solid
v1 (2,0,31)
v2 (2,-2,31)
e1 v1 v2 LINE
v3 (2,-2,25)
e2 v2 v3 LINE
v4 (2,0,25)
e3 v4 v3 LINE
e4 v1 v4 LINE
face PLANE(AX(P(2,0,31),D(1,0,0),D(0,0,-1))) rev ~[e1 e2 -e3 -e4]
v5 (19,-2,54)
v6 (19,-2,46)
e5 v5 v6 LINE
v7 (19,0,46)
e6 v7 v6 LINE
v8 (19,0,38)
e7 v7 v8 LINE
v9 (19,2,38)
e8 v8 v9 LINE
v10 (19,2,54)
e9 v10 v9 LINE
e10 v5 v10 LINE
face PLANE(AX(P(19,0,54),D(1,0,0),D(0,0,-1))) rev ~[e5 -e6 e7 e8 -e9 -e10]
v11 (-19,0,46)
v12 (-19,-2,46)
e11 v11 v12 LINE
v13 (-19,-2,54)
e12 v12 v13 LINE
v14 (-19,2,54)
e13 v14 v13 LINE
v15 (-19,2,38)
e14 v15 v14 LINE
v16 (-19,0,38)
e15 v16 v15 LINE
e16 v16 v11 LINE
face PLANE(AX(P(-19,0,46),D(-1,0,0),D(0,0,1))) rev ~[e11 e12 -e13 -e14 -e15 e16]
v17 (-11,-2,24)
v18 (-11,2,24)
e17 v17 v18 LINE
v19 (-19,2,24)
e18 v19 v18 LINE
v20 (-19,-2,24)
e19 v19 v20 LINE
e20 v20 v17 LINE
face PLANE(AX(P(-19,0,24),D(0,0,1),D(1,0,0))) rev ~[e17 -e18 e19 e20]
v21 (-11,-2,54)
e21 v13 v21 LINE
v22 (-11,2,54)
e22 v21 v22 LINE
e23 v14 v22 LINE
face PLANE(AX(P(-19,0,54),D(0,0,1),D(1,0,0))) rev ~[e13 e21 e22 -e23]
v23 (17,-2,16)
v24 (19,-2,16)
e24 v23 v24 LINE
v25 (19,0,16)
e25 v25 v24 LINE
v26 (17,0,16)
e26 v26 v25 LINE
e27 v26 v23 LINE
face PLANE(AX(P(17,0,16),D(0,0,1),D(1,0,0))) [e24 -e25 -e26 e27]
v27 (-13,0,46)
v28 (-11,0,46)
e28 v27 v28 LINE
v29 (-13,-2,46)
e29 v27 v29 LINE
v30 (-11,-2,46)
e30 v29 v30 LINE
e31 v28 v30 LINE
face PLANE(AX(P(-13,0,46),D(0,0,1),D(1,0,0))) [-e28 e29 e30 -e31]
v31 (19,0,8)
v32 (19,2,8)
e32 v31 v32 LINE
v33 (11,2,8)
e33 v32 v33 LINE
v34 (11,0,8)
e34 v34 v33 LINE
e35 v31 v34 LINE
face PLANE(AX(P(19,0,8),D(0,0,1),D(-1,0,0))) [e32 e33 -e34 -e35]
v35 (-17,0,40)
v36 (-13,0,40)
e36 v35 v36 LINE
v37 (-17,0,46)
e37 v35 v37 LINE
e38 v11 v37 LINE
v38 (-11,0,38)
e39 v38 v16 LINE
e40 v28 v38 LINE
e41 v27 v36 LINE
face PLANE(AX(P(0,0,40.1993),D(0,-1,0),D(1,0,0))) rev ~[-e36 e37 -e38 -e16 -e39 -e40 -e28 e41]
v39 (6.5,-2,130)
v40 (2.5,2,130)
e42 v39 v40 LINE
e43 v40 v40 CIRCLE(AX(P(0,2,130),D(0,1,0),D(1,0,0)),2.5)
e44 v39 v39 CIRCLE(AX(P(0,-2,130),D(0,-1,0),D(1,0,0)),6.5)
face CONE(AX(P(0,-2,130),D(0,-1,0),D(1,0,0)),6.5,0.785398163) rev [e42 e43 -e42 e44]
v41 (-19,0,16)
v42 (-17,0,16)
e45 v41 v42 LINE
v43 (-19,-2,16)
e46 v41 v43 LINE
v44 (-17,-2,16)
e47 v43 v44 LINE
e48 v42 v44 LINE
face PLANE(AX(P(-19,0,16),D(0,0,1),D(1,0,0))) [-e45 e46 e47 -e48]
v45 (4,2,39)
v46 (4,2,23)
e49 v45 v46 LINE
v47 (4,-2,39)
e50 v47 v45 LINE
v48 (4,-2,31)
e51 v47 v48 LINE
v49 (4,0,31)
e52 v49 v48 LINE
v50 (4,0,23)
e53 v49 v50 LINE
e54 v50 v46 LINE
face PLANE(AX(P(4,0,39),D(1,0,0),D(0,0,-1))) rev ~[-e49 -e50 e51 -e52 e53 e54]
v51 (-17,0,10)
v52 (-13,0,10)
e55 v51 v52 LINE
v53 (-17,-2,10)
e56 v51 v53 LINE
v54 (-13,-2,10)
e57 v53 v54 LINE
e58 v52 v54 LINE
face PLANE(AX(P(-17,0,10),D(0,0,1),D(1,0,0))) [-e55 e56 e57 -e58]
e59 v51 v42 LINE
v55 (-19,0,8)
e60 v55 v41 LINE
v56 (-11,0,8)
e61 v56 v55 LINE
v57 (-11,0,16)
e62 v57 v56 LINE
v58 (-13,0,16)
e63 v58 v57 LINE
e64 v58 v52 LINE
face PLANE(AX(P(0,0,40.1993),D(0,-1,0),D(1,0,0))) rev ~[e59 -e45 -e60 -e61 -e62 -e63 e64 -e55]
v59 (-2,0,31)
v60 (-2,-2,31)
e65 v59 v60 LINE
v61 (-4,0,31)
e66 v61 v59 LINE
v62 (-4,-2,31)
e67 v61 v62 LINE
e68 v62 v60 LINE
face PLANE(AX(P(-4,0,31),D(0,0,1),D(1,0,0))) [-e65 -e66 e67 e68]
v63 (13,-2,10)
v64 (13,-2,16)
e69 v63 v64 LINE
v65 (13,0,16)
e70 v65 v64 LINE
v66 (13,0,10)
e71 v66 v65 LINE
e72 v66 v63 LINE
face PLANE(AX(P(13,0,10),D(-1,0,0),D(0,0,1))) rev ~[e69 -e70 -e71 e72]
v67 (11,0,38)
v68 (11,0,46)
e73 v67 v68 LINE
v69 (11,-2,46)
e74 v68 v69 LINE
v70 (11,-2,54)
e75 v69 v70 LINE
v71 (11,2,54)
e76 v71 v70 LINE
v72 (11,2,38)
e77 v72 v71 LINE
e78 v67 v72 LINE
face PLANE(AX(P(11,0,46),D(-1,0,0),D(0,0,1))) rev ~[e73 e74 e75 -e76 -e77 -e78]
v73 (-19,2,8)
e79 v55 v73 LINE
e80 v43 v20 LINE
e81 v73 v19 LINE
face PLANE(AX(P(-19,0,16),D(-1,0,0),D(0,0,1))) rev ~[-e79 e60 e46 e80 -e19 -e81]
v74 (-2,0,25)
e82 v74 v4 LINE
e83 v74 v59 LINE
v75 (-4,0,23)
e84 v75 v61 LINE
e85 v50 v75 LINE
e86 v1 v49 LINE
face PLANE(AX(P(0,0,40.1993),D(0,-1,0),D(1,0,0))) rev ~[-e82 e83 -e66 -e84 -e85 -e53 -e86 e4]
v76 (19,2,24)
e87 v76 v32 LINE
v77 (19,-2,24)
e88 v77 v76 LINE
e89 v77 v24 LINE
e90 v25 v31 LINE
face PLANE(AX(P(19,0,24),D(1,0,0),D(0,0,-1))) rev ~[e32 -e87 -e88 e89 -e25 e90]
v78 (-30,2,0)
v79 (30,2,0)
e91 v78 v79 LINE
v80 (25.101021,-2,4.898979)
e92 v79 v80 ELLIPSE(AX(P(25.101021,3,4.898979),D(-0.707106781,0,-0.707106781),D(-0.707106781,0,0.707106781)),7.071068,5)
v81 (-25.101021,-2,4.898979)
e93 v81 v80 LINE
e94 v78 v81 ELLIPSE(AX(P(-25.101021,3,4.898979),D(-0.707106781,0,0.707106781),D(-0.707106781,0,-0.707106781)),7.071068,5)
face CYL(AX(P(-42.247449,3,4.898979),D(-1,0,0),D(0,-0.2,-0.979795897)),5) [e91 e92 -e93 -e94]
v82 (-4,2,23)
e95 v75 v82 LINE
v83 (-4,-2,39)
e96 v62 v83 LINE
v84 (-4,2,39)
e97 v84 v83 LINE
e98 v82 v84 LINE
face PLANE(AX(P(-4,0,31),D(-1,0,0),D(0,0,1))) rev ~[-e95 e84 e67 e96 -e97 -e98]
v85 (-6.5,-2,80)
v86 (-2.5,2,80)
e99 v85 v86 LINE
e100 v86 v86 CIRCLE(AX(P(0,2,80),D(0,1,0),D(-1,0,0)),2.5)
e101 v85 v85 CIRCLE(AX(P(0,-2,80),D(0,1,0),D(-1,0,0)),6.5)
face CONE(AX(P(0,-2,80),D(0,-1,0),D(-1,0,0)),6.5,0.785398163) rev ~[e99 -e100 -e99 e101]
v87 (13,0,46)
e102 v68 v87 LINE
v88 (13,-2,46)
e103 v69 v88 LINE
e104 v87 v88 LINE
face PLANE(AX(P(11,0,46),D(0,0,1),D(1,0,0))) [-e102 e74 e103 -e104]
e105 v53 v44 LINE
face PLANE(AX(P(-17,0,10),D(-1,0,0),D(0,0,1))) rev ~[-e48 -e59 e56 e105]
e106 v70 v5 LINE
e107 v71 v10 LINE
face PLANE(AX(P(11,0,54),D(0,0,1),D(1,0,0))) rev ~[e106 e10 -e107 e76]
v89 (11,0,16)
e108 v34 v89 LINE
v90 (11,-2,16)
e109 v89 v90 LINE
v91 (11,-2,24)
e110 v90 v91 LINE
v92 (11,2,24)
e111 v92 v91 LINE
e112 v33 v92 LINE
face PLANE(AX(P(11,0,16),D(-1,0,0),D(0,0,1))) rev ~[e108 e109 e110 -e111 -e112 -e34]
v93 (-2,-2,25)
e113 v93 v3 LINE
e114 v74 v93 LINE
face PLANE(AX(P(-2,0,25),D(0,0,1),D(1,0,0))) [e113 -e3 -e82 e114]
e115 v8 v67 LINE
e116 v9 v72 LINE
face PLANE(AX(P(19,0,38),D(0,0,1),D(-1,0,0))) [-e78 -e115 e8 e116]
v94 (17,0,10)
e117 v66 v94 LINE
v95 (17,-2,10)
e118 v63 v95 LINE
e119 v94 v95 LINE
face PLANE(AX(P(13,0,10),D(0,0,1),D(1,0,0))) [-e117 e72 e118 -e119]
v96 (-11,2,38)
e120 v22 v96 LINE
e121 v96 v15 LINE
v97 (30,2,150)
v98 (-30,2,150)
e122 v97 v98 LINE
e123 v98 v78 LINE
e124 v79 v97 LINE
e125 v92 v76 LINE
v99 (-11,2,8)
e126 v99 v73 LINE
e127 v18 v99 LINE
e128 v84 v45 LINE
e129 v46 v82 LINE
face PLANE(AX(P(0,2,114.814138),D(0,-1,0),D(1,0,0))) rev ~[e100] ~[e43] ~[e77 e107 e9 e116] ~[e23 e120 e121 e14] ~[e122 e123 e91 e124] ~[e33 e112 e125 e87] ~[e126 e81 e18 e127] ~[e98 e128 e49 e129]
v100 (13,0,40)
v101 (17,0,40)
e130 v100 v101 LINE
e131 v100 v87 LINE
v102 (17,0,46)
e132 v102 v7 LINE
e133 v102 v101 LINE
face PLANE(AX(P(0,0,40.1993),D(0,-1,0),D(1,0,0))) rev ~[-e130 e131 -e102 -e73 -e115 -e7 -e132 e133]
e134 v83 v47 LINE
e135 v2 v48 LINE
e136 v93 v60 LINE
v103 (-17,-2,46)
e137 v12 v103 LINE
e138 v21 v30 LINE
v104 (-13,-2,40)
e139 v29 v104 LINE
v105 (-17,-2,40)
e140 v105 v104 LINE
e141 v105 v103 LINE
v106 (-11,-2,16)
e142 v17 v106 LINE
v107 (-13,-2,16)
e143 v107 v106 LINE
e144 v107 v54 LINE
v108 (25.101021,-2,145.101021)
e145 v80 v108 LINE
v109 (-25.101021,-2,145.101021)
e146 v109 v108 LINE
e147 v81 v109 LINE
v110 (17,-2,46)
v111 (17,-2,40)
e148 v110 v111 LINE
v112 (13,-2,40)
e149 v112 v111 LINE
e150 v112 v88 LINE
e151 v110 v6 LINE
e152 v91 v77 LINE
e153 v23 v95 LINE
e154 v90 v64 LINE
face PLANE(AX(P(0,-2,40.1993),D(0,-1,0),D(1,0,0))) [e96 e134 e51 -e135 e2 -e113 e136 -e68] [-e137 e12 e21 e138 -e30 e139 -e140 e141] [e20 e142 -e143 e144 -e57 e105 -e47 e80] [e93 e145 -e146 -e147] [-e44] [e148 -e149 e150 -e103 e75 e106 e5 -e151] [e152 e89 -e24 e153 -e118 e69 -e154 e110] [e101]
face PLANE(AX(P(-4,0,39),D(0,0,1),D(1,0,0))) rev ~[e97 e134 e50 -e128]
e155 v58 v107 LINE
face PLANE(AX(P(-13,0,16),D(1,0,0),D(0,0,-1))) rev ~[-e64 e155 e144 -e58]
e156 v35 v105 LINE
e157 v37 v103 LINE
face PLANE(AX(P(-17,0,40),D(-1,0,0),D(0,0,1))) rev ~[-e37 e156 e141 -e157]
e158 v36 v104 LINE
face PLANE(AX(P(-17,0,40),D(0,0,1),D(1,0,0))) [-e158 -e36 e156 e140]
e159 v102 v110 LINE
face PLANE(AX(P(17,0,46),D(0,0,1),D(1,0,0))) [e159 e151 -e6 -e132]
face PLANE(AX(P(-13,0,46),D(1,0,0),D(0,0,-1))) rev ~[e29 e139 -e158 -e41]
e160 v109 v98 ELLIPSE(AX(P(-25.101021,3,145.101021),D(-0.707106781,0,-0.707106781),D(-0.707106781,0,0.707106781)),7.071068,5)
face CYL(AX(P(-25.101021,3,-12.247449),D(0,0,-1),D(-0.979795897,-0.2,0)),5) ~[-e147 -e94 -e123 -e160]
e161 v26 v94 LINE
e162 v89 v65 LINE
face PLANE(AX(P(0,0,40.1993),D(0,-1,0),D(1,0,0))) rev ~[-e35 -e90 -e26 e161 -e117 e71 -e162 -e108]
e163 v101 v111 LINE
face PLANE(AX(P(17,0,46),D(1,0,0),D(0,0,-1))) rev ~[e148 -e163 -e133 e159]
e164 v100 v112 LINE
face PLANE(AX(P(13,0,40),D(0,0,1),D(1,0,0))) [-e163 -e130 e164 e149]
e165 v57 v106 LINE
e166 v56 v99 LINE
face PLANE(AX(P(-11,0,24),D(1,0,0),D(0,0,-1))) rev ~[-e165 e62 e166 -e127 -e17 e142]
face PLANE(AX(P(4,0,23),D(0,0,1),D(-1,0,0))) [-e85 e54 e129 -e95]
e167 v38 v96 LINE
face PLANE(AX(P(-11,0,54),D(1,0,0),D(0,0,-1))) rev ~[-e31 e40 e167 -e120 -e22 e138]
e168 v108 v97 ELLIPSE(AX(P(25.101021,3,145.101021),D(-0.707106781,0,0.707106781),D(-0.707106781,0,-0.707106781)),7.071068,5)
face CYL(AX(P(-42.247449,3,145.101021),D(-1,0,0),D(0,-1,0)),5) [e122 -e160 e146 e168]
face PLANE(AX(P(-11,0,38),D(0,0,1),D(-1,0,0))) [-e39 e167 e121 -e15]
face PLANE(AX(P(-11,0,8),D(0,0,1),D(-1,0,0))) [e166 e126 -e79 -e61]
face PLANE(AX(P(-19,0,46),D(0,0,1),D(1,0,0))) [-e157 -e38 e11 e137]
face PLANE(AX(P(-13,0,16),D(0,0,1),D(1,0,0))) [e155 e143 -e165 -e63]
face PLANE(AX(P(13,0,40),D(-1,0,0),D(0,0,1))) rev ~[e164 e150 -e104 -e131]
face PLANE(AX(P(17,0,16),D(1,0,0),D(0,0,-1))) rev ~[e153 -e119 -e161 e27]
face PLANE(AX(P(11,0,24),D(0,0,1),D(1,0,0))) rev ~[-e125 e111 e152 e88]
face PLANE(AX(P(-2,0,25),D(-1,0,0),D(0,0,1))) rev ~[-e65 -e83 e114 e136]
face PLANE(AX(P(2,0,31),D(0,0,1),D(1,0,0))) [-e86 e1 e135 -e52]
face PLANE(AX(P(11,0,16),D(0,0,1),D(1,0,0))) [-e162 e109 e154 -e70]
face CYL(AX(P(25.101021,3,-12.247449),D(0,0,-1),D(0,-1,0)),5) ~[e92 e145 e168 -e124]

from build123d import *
from build123d import SkipClean  # not in build123d's __all__

# Parameters (mm, degrees)
F0_R        = 1.5
F1_DEPTH    = 2
F0_W        = 2
F0_H        = 6
F0_H_2      = 2
F0_W_2      = 4
F2_DEPTH    = 2
F4_T1_DEPTH = 84.4948974279
F4_T3_DEPTH = 174.4948974279


# Not quite as in the source:
# - a fillet or chamfer that OpenCascade refuses, or shapes differently, is made with other operations: its cross-section is extruded or revolved along the edge and cut away or added


with BuildPart() as f1:
    # F0 (on Front) → F1 (new body)
    with BuildSketch(Plane.XZ):
        with BuildLine():
            Line((-30, 150), (-30, 80))
            Line((-30, 80), (-1.5, 80))
            ThreePointArc((-1.5, 80), (0, 81.5), (1.5, 80))
            Line((1.5, 80), (30, 80))
            Line((30, 80), (30, 150))
            Line((30, 150), (-30, 150))
        make_face()
        with Locations((0, 130)):
            Circle(F0_R, mode=Mode.SUBTRACT)
        with BuildLine():
            Line((-30, 0), (0, 0))
            Line((0, 0), (30, 0))
            Line((30, 0), (30, 80))
            Line((30, 80), (1.5, 80))
            ThreePointArc((1.5, 80), (0, 78.5), (-1.5, 80))
            Line((-1.5, 80), (-30, 80))
            Line((-30, 80), (-30, 0))
        make_face()
        Polygon((-11, 24), (-11, 16), (-11, 10), (-11, 8), (-13, 8), (-17, 8), (-19, 8), (-19, 10), (-19, 16), (-19, 24), align=None, mode=Mode.SUBTRACT)
        Polygon((-11, 48), (-11, 46), (-11, 40), (-11, 38), (-13, 38), (-17, 38), (-19, 38), (-19, 40), (-19, 46), (-19, 48), (-19, 54), (-11, 54), align=None, mode=Mode.SUBTRACT)
        Polygon((4, 39), (4, 31), (4, 25), (4, 23), (2, 23), (-2, 23), (-4, 23), (-4, 25), (-4, 31), (-4, 39), align=None, mode=Mode.SUBTRACT)
        Polygon((19, 24), (19, 16), (19, 10), (19, 8), (17, 8), (13, 8), (11, 8), (11, 10), (11, 16), (11, 24), align=None, mode=Mode.SUBTRACT)
        Polygon((19, 54), (19, 46), (19, 40), (19, 38), (17, 38), (13, 38), (11, 38), (11, 40), (11, 46), (11, 54), align=None, mode=Mode.SUBTRACT)
    extrude(amount=-F1_DEPTH)

    # F0 (on Front) → F2 (join)
    with BuildSketch(Plane.XZ):
        with BuildLine():
            Line((-30, 0), (0, 0))
            Line((0, 0), (30, 0))
            Line((30, 0), (30, 80))
            Line((30, 80), (1.5, 80))
            ThreePointArc((1.5, 80), (0, 78.5), (-1.5, 80))
            Line((-1.5, 80), (-30, 80))
            Line((-30, 80), (-30, 0))
        make_face()
        Polygon((-11, 24), (-11, 16), (-11, 10), (-11, 8), (-13, 8), (-17, 8), (-19, 8), (-19, 10), (-19, 16), (-19, 24), align=None, mode=Mode.SUBTRACT)
        Polygon((-11, 48), (-11, 46), (-11, 40), (-11, 38), (-13, 38), (-17, 38), (-19, 38), (-19, 40), (-19, 46), (-19, 48), (-19, 54), (-11, 54), align=None, mode=Mode.SUBTRACT)
        Polygon((4, 39), (4, 31), (4, 25), (4, 23), (2, 23), (-2, 23), (-4, 23), (-4, 25), (-4, 31), (-4, 39), align=None, mode=Mode.SUBTRACT)
        Polygon((19, 24), (19, 16), (19, 10), (19, 8), (17, 8), (13, 8), (11, 8), (11, 10), (11, 16), (11, 24), align=None, mode=Mode.SUBTRACT)
        Polygon((19, 54), (19, 46), (19, 40), (19, 38), (17, 38), (13, 38), (11, 38), (11, 40), (11, 46), (11, 54), align=None, mode=Mode.SUBTRACT)
        with BuildLine():
            Line((-30, 150), (-30, 80))
            Line((-30, 80), (-1.5, 80))
            ThreePointArc((-1.5, 80), (0, 81.5), (1.5, 80))
            Line((1.5, 80), (30, 80))
            Line((30, 80), (30, 150))
            Line((30, 150), (-30, 150))
        make_face()
        with Locations((0, 130)):
            Circle(F0_R, mode=Mode.SUBTRACT)
        with Locations((-12, 43)):
            Rectangle(F0_W, F0_H)
        with Locations((-12, 39)):
            Rectangle(F0_W, F0_H_2)
        with Locations((-18, 43)):
            Rectangle(F0_W, F0_H)
        with Locations((-15, 39)):
            Rectangle(F0_W_2, F0_H_2)
        with Locations((-18, 39)):
            Rectangle(F0_W, F0_H_2)
        with Locations((18, 43)):
            Rectangle(F0_W, F0_H)
        with Locations((18, 39)):
            Rectangle(F0_W, F0_H_2)
        with Locations((12, 43)):
            Rectangle(F0_W, F0_H)
        with Locations((15, 39)):
            Rectangle(F0_W_2, F0_H_2)
        with Locations((12, 39)):
            Rectangle(F0_W, F0_H_2)
        with Locations((3, 28)):
            Rectangle(F0_W, F0_H)
        with Locations((3, 24)):
            Rectangle(F0_W, F0_H_2)
        with Locations((-3, 28)):
            Rectangle(F0_W, F0_H)
        with Locations((0, 24)):
            Rectangle(F0_W_2, F0_H_2)
        with Locations((-3, 24)):
            Rectangle(F0_W, F0_H_2)
        with Locations((-12, 13)):
            Rectangle(F0_W, F0_H)
        with Locations((-12, 9)):
            Rectangle(F0_W, F0_H_2)
        with Locations((-18, 13)):
            Rectangle(F0_W, F0_H)
        with Locations((-15, 9)):
            Rectangle(F0_W_2, F0_H_2)
        with Locations((-18, 9)):
            Rectangle(F0_W, F0_H_2)
        with Locations((18, 13)):
            Rectangle(F0_W, F0_H)
        with Locations((18, 9)):
            Rectangle(F0_W, F0_H_2)
        with Locations((12, 13)):
            Rectangle(F0_W, F0_H)
        with Locations((15, 9)):
            Rectangle(F0_W_2, F0_H_2)
        with Locations((12, 9)):
            Rectangle(F0_W, F0_H_2)
    with SkipClean():  # cleaning this boolean's faces spoils the solid; the shape is the same uncleaned
        extrude(amount=F2_DEPTH)

    # F3: chamfer of 5 on 2 edges, made by hand

    # F3_s1 → F3_t2 (revolve, cut)
    with BuildSketch(Plane.XY.offset(130)):
        Polygon((6.5, -2), (1.5, 3), (1.5, -2), align=None)
    revolve(axis=Axis((0, -2, 130), (0, -1, 0)), mode=Mode.SUBTRACT)

    # F3_s3 → F3_t4 (revolve, cut)
    with BuildSketch(Plane.XY.offset(80)):
        Polygon((-6.5, -2), (-1.5, 3), (-1.5, -2), align=None)
    revolve(axis=Axis((0, -2, 80), (0, 1, 0)), mode=Mode.SUBTRACT)

    # F4: fillet of radius 5 on 4 edges, made by hand

    # F4_s2 → F4_t1 (cut)
    with BuildSketch(Plane.YZ.offset(-42.2474487139)):
        with BuildLine():
            ThreePointArc((2, 0), (-0.8729833462, 1.7367018254), (-2, 4.8989794856))
            Line((-2, 4.8989794856), (-2, 0))
            Line((-2, 0), (2, 0))
        make_face()
        with BuildLine():
            ThreePointArc((-2, 145.1010205144), (-0.8729833462, 148.2632981746), (2, 150))
            Line((2, 150), (-2, 150))
            Line((-2, 150), (-2, 145.1010205144))
        make_face()
    extrude(amount=F4_T1_DEPTH, mode=Mode.SUBTRACT)

    # F4_s4 → F4_t3 (cut)
    with BuildSketch(Plane.XY.offset(-12.2474487139)):
        with BuildLine():
            ThreePointArc((-30, 2), (-28.2632981746, -0.8729833462), (-25.1010205144, -2))
            Line((-25.1010205144, -2), (-30, -2))
            Line((-30, -2), (-30, 2))
        make_face()
        with BuildLine():
            ThreePointArc((25.1010205144, -2), (28.2632981746, -0.8729833462), (30, 2))
            Line((30, 2), (30, -2))
            Line((30, -2), (25.1010205144, -2))
        make_face()
    extrude(amount=F4_T3_DEPTH, mode=Mode.SUBTRACT)


solid = f1.part
